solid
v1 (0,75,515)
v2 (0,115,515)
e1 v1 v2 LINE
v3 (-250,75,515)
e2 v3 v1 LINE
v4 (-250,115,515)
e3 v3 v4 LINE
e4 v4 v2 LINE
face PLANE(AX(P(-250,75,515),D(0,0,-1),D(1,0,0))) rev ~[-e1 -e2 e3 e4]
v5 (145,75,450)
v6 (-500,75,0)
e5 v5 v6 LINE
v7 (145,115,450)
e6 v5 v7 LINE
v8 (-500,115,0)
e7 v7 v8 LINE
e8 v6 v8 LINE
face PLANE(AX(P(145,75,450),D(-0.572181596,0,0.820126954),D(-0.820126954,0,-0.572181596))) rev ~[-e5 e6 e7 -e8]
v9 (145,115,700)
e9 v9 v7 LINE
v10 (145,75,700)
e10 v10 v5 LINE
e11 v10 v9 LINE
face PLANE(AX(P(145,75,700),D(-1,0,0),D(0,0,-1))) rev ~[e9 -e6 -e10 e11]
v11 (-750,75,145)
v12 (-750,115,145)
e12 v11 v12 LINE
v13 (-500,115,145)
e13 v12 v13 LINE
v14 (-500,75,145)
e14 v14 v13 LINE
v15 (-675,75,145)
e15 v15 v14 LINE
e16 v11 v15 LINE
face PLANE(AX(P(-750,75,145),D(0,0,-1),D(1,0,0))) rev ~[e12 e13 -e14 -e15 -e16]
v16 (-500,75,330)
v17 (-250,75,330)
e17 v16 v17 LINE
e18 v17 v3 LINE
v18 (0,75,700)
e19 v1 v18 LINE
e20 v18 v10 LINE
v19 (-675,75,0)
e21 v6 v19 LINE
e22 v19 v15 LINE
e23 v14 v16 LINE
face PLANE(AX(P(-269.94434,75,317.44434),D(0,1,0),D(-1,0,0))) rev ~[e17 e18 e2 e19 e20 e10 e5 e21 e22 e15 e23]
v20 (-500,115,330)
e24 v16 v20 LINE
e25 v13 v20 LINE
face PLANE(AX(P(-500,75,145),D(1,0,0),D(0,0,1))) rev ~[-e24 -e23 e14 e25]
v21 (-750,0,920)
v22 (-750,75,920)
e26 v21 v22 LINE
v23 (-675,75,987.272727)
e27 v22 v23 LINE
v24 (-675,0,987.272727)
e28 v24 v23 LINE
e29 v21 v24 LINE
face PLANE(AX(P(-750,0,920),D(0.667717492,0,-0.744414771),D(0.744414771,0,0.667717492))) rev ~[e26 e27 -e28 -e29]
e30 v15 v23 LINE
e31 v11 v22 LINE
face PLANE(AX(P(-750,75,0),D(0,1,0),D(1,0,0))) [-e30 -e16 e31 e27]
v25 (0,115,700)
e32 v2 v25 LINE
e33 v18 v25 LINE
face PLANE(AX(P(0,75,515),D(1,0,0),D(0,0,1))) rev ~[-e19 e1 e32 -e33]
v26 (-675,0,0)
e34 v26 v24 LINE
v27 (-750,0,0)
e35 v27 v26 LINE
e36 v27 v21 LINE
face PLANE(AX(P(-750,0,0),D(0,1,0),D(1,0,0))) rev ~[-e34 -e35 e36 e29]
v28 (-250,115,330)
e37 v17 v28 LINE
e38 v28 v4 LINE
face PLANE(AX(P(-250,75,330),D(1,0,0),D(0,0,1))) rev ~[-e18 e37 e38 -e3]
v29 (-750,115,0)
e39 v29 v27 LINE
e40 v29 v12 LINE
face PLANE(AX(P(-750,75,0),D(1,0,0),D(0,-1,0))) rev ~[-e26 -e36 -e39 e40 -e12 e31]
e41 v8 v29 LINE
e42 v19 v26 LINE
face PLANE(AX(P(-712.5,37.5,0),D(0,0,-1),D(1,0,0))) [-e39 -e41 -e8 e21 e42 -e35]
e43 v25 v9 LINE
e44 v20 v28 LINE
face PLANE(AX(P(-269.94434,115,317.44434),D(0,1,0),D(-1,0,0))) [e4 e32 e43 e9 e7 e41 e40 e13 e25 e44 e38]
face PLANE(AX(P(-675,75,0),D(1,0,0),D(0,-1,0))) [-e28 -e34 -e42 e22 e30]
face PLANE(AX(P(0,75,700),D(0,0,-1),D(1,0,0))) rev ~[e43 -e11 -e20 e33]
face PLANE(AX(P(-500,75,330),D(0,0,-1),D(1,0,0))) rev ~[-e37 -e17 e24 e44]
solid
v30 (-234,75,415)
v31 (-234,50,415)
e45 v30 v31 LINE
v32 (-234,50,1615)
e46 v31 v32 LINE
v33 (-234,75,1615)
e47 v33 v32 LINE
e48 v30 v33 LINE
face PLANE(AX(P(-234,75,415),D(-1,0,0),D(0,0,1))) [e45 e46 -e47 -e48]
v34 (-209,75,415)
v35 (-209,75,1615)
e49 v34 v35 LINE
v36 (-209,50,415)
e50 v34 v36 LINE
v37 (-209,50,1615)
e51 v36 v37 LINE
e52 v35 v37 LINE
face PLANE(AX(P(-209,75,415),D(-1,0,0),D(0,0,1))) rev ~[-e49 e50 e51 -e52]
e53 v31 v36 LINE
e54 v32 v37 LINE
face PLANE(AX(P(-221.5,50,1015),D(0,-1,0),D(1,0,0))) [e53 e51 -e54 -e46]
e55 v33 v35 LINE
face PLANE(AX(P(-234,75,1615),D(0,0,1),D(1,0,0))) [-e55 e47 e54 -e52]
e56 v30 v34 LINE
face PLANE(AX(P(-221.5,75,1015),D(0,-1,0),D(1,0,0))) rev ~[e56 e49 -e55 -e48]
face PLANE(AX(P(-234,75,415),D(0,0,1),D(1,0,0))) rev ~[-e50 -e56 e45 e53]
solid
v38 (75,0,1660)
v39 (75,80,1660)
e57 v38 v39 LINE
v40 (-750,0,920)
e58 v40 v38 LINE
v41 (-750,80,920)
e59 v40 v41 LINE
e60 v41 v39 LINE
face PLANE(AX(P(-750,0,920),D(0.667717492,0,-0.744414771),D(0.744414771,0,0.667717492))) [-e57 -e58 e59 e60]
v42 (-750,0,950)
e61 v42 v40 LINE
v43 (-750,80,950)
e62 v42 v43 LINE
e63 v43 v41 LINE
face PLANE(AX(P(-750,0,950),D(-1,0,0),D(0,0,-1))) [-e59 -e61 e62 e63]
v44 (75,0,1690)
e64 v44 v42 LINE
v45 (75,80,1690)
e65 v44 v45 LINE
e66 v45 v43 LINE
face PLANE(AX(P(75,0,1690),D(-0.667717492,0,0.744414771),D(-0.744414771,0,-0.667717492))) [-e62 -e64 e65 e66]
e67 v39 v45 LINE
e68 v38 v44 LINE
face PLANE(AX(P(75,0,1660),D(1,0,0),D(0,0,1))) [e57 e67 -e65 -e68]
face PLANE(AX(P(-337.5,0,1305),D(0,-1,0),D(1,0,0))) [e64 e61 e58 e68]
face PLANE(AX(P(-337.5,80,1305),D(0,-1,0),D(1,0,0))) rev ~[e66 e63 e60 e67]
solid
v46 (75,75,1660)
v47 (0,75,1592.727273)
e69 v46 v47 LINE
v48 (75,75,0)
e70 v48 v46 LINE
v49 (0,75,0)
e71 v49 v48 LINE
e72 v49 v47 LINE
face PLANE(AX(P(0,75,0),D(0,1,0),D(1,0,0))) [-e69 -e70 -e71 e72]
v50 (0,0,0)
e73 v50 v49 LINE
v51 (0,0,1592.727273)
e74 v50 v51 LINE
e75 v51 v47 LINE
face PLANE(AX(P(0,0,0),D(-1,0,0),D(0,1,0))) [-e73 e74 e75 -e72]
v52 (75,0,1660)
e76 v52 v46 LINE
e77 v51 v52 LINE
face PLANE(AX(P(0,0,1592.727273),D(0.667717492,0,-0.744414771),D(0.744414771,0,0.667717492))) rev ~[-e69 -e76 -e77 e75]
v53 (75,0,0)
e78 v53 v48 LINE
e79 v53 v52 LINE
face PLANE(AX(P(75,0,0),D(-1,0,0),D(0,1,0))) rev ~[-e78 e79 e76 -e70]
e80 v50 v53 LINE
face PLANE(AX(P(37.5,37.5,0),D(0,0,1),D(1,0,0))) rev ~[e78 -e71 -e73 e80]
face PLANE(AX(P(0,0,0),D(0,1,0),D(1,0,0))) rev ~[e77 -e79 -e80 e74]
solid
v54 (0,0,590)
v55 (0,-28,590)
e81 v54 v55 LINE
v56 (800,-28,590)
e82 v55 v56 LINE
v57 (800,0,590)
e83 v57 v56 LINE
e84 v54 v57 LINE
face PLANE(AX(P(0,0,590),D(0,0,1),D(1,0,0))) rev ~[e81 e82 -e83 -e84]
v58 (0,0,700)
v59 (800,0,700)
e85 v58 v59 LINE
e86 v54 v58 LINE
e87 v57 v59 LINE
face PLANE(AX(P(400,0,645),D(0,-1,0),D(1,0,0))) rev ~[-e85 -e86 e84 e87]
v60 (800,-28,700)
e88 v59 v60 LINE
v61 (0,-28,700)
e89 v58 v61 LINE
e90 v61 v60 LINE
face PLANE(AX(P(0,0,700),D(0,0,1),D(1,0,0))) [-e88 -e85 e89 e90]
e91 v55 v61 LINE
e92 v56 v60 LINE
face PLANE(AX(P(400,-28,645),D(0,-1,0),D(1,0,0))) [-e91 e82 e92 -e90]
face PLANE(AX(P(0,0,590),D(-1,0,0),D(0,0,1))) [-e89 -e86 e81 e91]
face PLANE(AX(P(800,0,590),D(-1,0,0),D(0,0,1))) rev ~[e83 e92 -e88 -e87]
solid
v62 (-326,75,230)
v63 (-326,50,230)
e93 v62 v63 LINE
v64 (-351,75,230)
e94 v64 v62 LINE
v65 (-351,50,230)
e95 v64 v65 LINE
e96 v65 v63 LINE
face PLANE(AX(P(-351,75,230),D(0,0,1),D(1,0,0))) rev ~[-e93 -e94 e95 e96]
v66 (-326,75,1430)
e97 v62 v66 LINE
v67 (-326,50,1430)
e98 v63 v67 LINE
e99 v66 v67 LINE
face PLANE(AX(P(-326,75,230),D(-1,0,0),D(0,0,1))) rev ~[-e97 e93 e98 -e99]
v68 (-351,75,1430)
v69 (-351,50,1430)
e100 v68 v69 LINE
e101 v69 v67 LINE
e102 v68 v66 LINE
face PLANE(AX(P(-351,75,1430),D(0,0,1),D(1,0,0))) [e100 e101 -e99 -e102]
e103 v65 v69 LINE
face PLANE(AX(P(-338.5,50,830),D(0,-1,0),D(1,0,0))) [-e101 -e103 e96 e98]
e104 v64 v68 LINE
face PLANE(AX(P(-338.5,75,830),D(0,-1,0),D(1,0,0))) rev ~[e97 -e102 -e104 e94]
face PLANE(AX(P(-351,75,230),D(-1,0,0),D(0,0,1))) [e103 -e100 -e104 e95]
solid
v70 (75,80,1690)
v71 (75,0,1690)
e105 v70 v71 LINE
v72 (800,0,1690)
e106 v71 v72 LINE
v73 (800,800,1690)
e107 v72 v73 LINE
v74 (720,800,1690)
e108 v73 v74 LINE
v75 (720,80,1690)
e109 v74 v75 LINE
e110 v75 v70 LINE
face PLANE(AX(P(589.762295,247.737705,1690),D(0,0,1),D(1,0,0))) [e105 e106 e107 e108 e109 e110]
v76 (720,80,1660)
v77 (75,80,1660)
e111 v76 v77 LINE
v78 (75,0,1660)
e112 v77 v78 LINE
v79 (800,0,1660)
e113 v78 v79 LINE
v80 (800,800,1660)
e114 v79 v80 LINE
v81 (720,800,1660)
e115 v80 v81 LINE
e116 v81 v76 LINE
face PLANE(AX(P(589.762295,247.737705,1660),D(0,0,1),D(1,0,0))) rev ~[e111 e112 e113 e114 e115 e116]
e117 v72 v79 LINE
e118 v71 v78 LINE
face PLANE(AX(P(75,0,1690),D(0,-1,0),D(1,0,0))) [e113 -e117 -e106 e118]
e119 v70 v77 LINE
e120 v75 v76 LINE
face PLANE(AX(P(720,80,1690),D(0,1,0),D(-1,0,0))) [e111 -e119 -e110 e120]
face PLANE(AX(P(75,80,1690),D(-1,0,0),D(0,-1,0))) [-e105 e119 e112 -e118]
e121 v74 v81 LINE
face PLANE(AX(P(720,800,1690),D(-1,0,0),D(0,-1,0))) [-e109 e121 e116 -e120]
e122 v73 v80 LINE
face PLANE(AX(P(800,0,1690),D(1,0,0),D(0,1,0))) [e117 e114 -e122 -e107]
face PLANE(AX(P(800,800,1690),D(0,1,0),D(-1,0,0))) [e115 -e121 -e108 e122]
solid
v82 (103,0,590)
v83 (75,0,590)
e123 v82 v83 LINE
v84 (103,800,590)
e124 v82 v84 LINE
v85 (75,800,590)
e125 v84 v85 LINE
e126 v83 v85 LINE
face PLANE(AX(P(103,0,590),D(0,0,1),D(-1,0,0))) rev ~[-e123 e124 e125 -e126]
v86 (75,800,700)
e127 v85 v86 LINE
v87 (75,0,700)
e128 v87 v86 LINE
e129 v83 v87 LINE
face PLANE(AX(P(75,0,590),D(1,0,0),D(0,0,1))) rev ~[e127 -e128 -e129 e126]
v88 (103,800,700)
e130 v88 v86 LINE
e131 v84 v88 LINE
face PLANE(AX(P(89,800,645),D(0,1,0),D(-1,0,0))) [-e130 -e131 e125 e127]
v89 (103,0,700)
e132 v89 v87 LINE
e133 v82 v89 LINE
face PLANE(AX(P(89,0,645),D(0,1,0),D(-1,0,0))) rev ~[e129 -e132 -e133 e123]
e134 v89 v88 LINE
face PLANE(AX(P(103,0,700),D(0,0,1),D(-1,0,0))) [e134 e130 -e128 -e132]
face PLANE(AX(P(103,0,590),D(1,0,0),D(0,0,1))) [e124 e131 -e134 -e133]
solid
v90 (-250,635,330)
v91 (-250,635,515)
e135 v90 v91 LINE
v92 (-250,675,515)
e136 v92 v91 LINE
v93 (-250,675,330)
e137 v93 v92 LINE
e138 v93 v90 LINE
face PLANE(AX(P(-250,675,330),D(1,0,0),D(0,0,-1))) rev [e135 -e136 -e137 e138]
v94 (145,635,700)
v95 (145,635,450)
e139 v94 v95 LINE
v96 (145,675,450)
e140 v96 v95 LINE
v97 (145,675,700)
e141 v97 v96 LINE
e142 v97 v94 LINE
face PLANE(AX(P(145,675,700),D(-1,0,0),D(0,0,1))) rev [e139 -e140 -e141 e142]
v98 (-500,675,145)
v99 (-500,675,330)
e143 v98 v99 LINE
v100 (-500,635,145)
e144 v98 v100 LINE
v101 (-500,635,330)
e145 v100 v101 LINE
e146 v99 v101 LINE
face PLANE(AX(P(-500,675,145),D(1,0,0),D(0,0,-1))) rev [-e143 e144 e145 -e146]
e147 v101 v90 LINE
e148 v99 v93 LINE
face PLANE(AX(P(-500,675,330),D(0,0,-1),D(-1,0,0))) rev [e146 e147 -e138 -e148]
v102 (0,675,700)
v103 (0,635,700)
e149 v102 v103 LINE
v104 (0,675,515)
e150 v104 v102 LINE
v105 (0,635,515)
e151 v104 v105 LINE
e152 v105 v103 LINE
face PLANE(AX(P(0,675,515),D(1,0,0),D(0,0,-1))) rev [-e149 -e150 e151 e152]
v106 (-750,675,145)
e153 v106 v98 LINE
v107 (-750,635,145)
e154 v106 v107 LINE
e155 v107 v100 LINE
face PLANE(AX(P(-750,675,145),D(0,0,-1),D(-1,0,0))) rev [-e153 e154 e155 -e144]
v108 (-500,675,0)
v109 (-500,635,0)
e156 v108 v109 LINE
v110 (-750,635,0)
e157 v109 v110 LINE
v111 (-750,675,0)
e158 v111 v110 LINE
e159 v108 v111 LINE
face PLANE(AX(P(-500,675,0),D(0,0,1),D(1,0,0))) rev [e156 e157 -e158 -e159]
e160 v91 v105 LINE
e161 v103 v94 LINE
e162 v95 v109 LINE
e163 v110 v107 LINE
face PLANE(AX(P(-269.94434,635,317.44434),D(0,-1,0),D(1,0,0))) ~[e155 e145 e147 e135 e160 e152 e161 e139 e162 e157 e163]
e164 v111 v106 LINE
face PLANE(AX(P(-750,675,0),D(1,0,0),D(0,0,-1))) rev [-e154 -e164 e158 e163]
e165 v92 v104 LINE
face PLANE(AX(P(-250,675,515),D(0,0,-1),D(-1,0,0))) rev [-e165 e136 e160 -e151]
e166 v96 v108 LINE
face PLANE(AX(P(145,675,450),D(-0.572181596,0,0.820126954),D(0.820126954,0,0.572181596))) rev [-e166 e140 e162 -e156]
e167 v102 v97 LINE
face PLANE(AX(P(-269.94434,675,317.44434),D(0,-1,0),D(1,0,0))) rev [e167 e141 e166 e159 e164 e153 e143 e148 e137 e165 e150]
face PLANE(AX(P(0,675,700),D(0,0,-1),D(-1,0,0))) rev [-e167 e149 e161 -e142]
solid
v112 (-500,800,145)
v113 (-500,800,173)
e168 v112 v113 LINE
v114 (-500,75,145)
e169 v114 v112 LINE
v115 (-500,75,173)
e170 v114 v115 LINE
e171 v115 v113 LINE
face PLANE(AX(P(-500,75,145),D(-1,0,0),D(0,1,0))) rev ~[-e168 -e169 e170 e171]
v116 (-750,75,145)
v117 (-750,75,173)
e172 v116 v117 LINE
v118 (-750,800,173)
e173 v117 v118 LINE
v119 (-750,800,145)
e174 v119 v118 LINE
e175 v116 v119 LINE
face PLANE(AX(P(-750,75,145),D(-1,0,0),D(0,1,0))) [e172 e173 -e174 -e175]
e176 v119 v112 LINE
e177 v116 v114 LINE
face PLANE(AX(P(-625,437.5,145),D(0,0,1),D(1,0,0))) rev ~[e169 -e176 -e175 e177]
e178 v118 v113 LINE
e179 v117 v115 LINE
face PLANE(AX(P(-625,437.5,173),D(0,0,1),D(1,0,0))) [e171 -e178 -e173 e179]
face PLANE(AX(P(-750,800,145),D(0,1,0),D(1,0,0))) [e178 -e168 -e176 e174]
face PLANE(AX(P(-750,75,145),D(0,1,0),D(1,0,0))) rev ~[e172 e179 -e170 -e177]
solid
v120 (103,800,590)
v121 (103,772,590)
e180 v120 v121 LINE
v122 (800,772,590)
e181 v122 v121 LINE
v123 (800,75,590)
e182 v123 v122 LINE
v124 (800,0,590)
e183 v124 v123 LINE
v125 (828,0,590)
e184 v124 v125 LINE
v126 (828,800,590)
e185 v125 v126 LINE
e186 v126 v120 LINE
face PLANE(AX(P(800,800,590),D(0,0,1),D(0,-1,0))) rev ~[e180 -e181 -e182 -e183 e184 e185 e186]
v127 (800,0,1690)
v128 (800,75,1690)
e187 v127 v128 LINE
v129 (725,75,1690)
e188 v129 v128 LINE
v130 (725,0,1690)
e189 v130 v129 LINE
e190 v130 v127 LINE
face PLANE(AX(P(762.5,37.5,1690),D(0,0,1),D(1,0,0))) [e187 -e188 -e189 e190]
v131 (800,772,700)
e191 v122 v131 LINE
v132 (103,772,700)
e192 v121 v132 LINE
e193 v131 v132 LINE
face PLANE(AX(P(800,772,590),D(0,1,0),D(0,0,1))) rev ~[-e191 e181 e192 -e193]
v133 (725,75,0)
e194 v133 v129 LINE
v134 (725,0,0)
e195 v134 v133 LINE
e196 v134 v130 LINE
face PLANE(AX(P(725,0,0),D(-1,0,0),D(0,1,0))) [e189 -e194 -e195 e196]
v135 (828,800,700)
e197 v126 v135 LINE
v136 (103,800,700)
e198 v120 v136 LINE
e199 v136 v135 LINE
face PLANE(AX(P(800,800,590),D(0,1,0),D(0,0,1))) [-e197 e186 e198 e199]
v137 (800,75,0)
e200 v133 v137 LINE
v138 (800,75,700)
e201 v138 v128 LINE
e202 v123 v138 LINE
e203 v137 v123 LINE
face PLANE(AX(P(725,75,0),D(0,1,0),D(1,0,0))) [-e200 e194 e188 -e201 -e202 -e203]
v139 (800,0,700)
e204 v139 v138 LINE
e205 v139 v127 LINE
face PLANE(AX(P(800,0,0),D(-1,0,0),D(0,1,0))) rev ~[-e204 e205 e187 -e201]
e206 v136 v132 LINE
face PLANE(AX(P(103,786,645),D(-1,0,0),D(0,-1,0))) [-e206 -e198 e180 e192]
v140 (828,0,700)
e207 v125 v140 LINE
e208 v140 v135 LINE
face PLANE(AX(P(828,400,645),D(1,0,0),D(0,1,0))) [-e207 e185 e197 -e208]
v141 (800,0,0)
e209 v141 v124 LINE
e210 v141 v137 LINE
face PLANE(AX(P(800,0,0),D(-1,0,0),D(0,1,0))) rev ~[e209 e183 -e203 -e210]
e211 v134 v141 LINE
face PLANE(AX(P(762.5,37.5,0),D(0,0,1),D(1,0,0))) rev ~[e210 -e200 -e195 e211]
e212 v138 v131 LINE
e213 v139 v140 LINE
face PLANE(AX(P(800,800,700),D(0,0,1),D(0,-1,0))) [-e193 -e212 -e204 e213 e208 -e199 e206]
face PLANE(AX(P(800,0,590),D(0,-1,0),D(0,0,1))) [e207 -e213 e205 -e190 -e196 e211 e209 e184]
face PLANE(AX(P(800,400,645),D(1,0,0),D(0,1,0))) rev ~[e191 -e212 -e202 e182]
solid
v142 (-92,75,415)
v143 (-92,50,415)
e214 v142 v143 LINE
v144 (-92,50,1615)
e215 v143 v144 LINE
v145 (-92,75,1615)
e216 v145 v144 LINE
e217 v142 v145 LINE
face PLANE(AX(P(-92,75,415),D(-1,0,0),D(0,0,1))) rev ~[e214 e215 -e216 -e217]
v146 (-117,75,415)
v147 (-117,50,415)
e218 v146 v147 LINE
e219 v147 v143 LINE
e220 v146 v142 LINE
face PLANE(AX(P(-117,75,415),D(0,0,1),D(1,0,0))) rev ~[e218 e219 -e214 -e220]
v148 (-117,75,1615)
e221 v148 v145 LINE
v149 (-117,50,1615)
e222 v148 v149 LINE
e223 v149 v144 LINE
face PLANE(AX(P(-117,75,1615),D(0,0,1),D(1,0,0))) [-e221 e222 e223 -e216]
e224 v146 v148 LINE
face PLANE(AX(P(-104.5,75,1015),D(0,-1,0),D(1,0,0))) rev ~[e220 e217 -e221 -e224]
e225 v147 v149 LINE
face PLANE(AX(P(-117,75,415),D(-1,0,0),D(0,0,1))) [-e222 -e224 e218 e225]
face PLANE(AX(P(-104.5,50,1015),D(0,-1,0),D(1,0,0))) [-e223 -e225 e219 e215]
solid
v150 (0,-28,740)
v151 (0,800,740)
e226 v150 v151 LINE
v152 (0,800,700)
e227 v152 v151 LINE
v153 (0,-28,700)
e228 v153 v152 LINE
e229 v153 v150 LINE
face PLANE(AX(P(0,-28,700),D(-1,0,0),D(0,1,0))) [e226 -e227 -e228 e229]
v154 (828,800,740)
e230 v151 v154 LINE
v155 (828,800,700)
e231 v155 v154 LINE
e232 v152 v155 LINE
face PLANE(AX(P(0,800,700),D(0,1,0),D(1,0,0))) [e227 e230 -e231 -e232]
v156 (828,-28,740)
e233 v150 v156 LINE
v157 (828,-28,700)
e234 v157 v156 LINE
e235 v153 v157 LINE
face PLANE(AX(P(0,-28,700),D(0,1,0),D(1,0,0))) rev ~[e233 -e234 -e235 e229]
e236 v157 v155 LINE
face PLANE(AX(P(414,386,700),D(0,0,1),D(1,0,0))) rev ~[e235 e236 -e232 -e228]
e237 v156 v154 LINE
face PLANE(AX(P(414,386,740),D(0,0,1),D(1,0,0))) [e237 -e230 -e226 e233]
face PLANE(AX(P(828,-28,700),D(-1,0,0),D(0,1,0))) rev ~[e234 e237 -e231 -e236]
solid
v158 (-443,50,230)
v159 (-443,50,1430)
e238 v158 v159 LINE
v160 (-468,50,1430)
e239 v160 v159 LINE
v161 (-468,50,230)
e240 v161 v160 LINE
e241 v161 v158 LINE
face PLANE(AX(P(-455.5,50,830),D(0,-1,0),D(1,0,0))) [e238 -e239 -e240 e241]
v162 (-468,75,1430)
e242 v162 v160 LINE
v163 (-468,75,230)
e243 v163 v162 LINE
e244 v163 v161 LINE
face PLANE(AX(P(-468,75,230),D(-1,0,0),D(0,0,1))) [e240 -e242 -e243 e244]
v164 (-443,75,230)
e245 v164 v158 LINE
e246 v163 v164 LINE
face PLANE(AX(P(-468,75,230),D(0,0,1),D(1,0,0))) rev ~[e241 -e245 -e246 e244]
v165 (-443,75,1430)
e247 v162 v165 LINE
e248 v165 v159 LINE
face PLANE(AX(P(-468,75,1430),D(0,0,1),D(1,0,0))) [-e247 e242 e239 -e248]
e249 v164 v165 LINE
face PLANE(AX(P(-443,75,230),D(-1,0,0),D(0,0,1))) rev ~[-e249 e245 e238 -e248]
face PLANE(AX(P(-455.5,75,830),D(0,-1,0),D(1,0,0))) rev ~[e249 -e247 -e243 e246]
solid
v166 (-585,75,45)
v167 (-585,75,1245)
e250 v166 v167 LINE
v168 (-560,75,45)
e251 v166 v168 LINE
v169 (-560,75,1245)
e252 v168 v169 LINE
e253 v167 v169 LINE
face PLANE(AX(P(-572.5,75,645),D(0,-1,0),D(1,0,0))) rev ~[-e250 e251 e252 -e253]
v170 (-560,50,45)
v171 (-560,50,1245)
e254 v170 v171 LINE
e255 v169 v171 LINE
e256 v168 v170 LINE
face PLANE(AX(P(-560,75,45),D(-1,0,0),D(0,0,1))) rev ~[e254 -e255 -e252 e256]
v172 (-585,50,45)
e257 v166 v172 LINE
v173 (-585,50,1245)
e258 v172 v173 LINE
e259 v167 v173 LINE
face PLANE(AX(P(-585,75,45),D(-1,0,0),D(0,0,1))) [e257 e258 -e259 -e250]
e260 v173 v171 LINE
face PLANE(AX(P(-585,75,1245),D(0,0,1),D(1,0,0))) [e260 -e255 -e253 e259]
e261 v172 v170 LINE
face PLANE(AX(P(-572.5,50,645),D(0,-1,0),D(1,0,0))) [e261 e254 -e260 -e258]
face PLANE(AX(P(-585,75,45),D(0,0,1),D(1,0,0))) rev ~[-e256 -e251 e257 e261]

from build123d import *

# Parameters (mm, degrees)
F0_W      = 75
F0_H      = 75
F1_DEPTH  = 1690
F2_W      = 800
F2_H      = 110
F3_DEPTH  = 28
F4_W      = 800
F4_H      = 110
F5_DEPTH  = 28
F6_W      = 28
F6_H      = 110
F7_DEPTH  = 800
F8_W      = 28
F8_H      = 110
F9_DEPTH  = 697
F10_W     = 828
F10_H     = 828
F11_DEPTH = 40
F15_DEPTH = 40
F17_W     = 75
F17_H     = 75
F18_DEPTH = 1000
F20_DEPTH = 75
F22_DEPTH = 80
F24_DEPTH = 800.001
F25_W     = 25
F25_H     = 1200
F26_DEPTH = 25
F28_DEPTH = 30
F29_W     = 250
F29_H     = 725
F30_DEPTH = 28


with BuildPart() as f1:
    # F0 (on Top) → F1 (new body)
    with BuildSketch(Plane.XY):
        with Locations((37.5, 37.5)):
            Rectangle(F0_W, F0_H)
    extrude(amount=F1_DEPTH)

    # F23 (on face) → F24 (cut, through all)
    with BuildSketch(Plane.XZ):
        Polygon((0, 1690), (0, 1592.7272727273), (75, 1660), (75, 1690), align=None)
    extrude(amount=-F24_DEPTH, mode=Mode.SUBTRACT)


with BuildPart() as f1b:
    # F0 (on Top) → F1, piece 2 (new body)
    with BuildSketch(Plane.XY):
        with Locations((762.5, 37.5)):
            Rectangle(F0_W, F0_H)
    extrude(amount=F1_DEPTH)

    # F4 (on face) → F5 (join)
    with BuildSketch(Plane.YZ.offset(800)):
        with Locations((400, 645)):
            Rectangle(F4_W, F4_H)
    extrude(amount=F5_DEPTH)

    # F8 (on face) → F9 (join, through all)
    with BuildSketch(Plane(origin=(800, 0, 0), x_dir=(0, -1, 0), z_dir=(-1, 0, 0))):
        with Locations((-786, 645)):
            Rectangle(F8_W, F8_H)
    extrude(amount=F9_DEPTH)


with BuildPart() as f3:
    # F2 (on face) → F3 (new body)
    with BuildSketch(Plane.XZ):
        with Locations((400, 645)):
            Rectangle(F2_W, F2_H)
    extrude(amount=F3_DEPTH)


with BuildPart() as f7:
    # F6 (on face) → F7 (new body, through all)
    with BuildSketch(Plane(origin=(0, 0, 0), x_dir=(-1, 0, 0), z_dir=(0, 1, 0))):
        with Locations((-89, 645)):
            Rectangle(F6_W, F6_H)
    extrude(amount=F7_DEPTH)


with BuildPart() as f11:
    # F10 (on face) → F11 (new body)
    with BuildSketch(Plane.XY.offset(700)):
        with Locations((414, 386)):
            Rectangle(F10_W, F10_H)
    extrude(amount=F11_DEPTH)


with BuildPart() as f15:
    # F14 (on offset) → F15 (new body)
    with BuildSketch(Plane(origin=(0, 75, 0), x_dir=(-1, 0, 0), z_dir=(0, 1, 0))):
        Polygon((0, 700), (-145, 700), (-145, 450), (500, 0), (750, 0), (750, 145), (500, 145), (500, 330), (250, 330), (250, 515), (0, 515), align=None)
    extrude(amount=F15_DEPTH)


with BuildPart() as f16_1:
    # F16: instance of F15
    add(f15.part.mirror(Plane(origin=(37.5, 375, 845), x_dir=(-1, 0, 0), z_dir=(0, 1, 0))))


with BuildPart() as f15_1:
    add(f15.part)

    # F17 (on face) → F18 (join)
    with BuildSketch(Plane(origin=(0, 0, 0), x_dir=(1, 0, 0), z_dir=(0, 0, -1))):
        with Locations((-712.5, -37.5)):
            Rectangle(F17_W, F17_H)
    extrude(amount=-F18_DEPTH)

    # F19 (on face) → F20 (cut, through all)
    with BuildSketch(Plane.XZ):
        Polygon((-750, 1000), (-750, 920), (-675, 987.2727272727), (-675, 1000), align=None)
    extrude(amount=-F20_DEPTH, mode=Mode.SUBTRACT)


with BuildPart() as f22:
    # F21 (on face) → F22 (new body)
    with BuildSketch(Plane.XZ):
        Polygon((75, 1690), (-750, 950), (-750, 920), (75, 1660), align=None)
    extrude(amount=-F22_DEPTH)


with BuildPart() as f26:
    # F25 (on face) → F26 (new body)
    with BuildSketch(Plane.XZ.offset(-75)):
        with Locations((-338.5, 830)):
            Rectangle(F25_W, F25_H)
    extrude(amount=F26_DEPTH)


with BuildPart() as f26b:
    # F25 (on face) → F26, piece 2 (new body)
    with BuildSketch(Plane.XZ.offset(-75)):
        with Locations((-221.5, 1015)):
            Rectangle(F25_W, F25_H)
    extrude(amount=F26_DEPTH)


with BuildPart() as f26c:
    # F25 (on face) → F26, piece 3 (new body)
    with BuildSketch(Plane.XZ.offset(-75)):
        with Locations((-104.5, 1015)):
            Rectangle(F25_W, F25_H)
    extrude(amount=F26_DEPTH)


with BuildPart() as f26d:
    # F25 (on face) → F26, piece 4 (new body)
    with BuildSketch(Plane.XZ.offset(-75)):
        with Locations((-455.5, 830)):
            Rectangle(F25_W, F25_H)
    extrude(amount=F26_DEPTH)


with BuildPart() as f26e:
    # F25 (on face) → F26, piece 5 (new body)
    with BuildSketch(Plane.XZ.offset(-75)):
        with Locations((-572.5, 645)):
            Rectangle(F25_W, F25_H)
    extrude(amount=F26_DEPTH)


with BuildPart() as f28:
    # F27 (on face) → F28 (new body)
    with BuildSketch(Plane.XY.offset(1690)):
        Polygon((800, 800), (720, 800), (720, 80), (75, 80), (75, 0), (725, 0), (800, 0), align=None)
    extrude(amount=-F28_DEPTH)


with BuildPart() as f30:
    # F29 (on face) → F30 (new body)
    with BuildSketch(Plane.XY.offset(145)):
        with Locations((-625, 437.5)):
            Rectangle(F29_W, F29_H)
    extrude(amount=F30_DEPTH)


solid = Compound([f1.part, f1b.part, f3.part, f7.part, f11.part, f16_1.part, f15_1.part, f22.part, f26.part, f26b.part, f26c.part, f26d.part, f26e.part, f28.part, f30.part])
